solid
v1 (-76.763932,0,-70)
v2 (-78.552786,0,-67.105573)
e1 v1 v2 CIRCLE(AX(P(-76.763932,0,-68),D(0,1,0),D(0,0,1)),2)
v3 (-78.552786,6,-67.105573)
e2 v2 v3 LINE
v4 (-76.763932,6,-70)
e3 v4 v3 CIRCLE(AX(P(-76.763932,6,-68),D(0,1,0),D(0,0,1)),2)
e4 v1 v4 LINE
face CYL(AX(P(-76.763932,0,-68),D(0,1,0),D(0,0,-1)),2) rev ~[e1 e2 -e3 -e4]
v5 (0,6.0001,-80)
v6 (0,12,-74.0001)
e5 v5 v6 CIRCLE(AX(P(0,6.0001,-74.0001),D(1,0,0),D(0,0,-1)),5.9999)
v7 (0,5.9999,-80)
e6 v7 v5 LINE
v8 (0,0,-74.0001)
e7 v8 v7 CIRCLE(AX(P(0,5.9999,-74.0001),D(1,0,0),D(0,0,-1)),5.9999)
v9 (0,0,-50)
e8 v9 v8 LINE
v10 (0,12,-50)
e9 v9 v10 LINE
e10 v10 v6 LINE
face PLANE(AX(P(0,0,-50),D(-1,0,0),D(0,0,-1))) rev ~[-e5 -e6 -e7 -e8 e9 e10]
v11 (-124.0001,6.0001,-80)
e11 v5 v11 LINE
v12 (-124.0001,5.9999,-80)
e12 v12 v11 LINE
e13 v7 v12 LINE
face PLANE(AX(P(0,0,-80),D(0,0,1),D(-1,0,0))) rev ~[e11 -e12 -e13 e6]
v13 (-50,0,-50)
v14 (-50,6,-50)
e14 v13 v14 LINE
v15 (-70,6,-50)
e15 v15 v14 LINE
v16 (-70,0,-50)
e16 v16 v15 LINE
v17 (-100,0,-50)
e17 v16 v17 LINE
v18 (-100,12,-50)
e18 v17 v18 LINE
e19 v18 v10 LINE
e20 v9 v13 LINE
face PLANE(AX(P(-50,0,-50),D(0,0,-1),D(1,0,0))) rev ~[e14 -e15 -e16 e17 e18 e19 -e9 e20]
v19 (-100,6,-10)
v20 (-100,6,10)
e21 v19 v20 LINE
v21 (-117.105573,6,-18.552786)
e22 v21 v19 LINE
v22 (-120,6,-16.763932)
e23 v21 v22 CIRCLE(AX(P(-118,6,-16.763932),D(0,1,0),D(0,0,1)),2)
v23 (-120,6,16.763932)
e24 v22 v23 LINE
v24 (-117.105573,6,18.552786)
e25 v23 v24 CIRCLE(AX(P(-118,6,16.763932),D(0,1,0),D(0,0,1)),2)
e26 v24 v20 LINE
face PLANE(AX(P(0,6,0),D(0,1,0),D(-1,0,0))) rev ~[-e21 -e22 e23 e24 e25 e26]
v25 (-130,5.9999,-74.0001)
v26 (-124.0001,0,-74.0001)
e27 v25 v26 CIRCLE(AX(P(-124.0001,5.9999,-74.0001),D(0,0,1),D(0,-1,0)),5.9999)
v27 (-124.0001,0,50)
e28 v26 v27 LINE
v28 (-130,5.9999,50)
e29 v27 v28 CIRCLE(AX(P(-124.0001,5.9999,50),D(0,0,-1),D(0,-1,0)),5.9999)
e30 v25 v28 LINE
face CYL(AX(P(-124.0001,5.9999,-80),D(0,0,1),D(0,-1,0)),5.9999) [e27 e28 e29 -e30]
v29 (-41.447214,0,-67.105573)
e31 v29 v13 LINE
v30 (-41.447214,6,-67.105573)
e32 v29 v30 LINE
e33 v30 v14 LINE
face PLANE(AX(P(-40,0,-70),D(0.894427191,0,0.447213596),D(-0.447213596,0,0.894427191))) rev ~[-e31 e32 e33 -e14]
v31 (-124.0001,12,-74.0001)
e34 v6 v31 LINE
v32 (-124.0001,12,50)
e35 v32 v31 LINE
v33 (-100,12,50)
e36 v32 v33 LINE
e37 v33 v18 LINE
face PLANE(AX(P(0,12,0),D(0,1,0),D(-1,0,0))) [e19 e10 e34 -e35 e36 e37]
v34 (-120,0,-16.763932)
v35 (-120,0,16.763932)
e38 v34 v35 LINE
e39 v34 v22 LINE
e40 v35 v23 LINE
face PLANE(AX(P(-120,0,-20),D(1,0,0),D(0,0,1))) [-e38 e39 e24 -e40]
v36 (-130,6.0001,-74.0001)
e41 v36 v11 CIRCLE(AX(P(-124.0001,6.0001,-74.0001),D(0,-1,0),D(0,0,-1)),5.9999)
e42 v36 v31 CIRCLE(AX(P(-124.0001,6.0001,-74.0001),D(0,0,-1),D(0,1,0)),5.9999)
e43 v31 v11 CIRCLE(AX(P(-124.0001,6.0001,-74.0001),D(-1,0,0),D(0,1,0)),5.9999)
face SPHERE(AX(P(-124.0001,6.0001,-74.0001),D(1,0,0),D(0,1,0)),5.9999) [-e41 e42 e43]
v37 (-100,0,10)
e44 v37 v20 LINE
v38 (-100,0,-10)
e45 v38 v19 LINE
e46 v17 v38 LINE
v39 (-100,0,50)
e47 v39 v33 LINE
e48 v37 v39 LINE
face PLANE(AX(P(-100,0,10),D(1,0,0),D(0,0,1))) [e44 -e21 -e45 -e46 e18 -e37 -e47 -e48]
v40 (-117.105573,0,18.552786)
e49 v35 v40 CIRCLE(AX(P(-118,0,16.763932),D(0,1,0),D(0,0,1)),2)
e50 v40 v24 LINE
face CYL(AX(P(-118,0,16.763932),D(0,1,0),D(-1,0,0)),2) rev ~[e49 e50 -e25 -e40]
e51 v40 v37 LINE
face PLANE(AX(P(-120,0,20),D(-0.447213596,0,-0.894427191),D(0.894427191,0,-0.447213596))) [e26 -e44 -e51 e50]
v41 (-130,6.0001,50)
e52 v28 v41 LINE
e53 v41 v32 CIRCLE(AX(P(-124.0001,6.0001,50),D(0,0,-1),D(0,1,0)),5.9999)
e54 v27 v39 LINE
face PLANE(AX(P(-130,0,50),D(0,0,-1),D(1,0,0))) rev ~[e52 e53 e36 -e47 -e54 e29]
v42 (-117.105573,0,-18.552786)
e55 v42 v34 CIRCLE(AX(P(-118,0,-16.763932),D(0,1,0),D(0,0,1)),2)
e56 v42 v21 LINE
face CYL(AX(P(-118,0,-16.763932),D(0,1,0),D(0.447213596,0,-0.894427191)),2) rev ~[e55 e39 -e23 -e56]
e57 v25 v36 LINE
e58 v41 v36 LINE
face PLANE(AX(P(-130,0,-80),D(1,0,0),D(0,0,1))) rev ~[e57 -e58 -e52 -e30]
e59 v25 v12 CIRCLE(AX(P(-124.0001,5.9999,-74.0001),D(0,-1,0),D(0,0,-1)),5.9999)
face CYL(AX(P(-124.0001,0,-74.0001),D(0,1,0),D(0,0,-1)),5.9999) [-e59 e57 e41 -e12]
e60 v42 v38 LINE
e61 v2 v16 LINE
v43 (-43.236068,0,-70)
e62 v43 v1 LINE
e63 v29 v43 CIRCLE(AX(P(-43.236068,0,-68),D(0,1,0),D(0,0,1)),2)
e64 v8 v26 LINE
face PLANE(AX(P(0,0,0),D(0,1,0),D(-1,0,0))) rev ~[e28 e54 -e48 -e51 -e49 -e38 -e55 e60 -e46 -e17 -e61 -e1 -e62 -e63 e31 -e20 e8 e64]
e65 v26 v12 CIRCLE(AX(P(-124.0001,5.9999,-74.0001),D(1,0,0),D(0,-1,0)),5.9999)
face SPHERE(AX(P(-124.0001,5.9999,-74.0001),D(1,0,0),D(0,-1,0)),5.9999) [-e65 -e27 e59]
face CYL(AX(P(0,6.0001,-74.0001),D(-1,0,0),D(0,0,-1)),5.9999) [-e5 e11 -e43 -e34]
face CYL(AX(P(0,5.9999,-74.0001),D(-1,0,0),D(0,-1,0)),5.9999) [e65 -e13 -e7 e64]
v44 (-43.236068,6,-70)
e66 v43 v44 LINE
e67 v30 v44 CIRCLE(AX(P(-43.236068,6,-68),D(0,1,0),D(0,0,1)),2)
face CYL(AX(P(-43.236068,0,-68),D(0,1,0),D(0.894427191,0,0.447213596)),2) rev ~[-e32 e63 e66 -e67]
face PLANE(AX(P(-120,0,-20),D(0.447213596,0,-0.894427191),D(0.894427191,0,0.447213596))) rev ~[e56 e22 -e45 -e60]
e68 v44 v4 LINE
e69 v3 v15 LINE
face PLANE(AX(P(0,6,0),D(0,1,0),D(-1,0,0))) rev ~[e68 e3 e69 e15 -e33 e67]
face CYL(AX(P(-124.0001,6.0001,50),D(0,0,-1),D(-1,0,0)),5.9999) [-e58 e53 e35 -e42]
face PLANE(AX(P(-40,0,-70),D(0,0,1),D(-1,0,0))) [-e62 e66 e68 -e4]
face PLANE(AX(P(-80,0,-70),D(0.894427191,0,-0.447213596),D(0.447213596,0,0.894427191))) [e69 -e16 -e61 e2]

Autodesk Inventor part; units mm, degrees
ref_plane "YZ Plane" through (0, 0, 0) normal (1, 0, 0) x (0, 1, 0)
ref_plane "XZ Plane" through (0, 0, 0) normal (0, 1, 0) x (-1, 0, 0)
ref_plane "XY Plane" through (0, 0, 0) normal (0, 0, 1) x (1, 0, 0)
sketch "Sketch1" plane through (0, 0, 0) normal (0, 1, 0) x (-1, 0, 0)
  line L0 (100, -50) -> (-100, -50)
  line L1 (-100, -50) -> (-100, 50)
  line L2 (100, -50) -> (-100, 50) construction
  line L3 (-100, -50) -> (100, 50) construction
  line L4 (-40, -30) -> (-80, -30)
  line L5 (-50, -50) -> (-70, -50)
  line L6 (-40, -30) -> (-50, -50)
  line L7 (-80, -30) -> (-70, -50)
  line L8 (70, -50) -> (50, -50)
  line L9 (-100, -10) -> (-100, 10)
  line L10 (-80, -20) -> (-80, 20)
  line L11 (-80, -20) -> (-100, -10)
  line L12 (-80, 20) -> (-100, 10)
  line L13 (-100, -50) -> (-130, -50)
  line L14 (-130, -50) -> (-130, 50)
  line L15 (-130, 50) -> (-100, 50)
  line L16 (-100, 50) -> (-100, -50)
  line L17 (-130, -50) -> (0, -50)
  line L18 (0, -50) -> (0, -80)
  line L19 (0, -80) -> (-130, -80)
  line L20 (-130, -80) -> (-130, -50)
  line L21 (-40, -70) -> (-80, -70)
  line L22 (-40, -70) -> (-50, -50)
  line L23 (-80, -70) -> (-70, -50)
  line L24 (-120, -20) -> (-120, 20)
  line L25 (-120, -20) -> (-100, -10)
  line L26 (-120, 20) -> (-100, 10)
  line L27 (40, -70) -> (50, -50)
  line L28 (40, -70) -> (80, -70)
  line L29 (80, -70) -> (70, -50)
  line L30 (100, -50) -> (100, 50)
  line L31 (130, -50) -> (130, 50)
  line L32 (130, 50) -> (100, 50)
  line L33 (130, -50) -> (0, -50)
  line L34 (0, -80) -> (130, -80)
  line L35 (130, -80) -> (130, -50)
  line L36 (40, -70) -> (50, -50)
  line L37 (40, -70) -> (80, -70)
  line L38 (80, -70) -> (70, -50)
  line L39 (120, -20) -> (100, -10)
  line L40 (120, 20) -> (100, 10)
  line L41 (120, -20) -> (120, 20)
  point P0 (0, 0)
  point P1 (-100, 10)
  point P2 (-100, -10)
  point P3 (-70, -50)
  point P4 (-50, -50)
  point P5 (0, 0)
  point P6 (0, 0)
  point P7 (0, -50)
  dimension "d72" = 200
  dimension "d73" = 100
  dimension "d78" = 20
  dimension "d79" = 40
  dimension "d80" = 20
  dimension "d81" = 10
  dimension "d82" = 20
  dimension "d86" = 120
  dimension "d88" = 0
  dimension "d90" = 40
  dimension "d91" = 20
  dimension "d92" = 20
  dimension "d93" = 10
  dimension "d94" = 40
  dimension "d95" = 0
  dimension "d114" = 30
  dimension "d115" = 130
  dimension "d116" = 30
extrude "Extrusion24" add sketch "Sketch1" along normal blind 12 contours L33 L35 L34 L18 L0 L27 L28 L29 | L30 L39 L41 L40 L32 L31 L33 | L29 L28 L27 L0 | L30 L40 L41 L39
extrude "Extrusion25" cut sketch "Sketch1" along normal blind 6 contours L29 L28 L27 L0 | L30 L40 L41 L39
fillet "Fillet12" radius 2 4 edges at (-40, 3, -70) (-80, 3, -70) (-120, 3, -20) (-120, 3, 20)
fillet "Fillet13" radius 6 5 edges at (-65, 12, -80) (-65, 0, -80) (-130, 12, -15) (-130, 0, -15) (-130, 6, -80)
properties part number "Test2_3DPrint"
